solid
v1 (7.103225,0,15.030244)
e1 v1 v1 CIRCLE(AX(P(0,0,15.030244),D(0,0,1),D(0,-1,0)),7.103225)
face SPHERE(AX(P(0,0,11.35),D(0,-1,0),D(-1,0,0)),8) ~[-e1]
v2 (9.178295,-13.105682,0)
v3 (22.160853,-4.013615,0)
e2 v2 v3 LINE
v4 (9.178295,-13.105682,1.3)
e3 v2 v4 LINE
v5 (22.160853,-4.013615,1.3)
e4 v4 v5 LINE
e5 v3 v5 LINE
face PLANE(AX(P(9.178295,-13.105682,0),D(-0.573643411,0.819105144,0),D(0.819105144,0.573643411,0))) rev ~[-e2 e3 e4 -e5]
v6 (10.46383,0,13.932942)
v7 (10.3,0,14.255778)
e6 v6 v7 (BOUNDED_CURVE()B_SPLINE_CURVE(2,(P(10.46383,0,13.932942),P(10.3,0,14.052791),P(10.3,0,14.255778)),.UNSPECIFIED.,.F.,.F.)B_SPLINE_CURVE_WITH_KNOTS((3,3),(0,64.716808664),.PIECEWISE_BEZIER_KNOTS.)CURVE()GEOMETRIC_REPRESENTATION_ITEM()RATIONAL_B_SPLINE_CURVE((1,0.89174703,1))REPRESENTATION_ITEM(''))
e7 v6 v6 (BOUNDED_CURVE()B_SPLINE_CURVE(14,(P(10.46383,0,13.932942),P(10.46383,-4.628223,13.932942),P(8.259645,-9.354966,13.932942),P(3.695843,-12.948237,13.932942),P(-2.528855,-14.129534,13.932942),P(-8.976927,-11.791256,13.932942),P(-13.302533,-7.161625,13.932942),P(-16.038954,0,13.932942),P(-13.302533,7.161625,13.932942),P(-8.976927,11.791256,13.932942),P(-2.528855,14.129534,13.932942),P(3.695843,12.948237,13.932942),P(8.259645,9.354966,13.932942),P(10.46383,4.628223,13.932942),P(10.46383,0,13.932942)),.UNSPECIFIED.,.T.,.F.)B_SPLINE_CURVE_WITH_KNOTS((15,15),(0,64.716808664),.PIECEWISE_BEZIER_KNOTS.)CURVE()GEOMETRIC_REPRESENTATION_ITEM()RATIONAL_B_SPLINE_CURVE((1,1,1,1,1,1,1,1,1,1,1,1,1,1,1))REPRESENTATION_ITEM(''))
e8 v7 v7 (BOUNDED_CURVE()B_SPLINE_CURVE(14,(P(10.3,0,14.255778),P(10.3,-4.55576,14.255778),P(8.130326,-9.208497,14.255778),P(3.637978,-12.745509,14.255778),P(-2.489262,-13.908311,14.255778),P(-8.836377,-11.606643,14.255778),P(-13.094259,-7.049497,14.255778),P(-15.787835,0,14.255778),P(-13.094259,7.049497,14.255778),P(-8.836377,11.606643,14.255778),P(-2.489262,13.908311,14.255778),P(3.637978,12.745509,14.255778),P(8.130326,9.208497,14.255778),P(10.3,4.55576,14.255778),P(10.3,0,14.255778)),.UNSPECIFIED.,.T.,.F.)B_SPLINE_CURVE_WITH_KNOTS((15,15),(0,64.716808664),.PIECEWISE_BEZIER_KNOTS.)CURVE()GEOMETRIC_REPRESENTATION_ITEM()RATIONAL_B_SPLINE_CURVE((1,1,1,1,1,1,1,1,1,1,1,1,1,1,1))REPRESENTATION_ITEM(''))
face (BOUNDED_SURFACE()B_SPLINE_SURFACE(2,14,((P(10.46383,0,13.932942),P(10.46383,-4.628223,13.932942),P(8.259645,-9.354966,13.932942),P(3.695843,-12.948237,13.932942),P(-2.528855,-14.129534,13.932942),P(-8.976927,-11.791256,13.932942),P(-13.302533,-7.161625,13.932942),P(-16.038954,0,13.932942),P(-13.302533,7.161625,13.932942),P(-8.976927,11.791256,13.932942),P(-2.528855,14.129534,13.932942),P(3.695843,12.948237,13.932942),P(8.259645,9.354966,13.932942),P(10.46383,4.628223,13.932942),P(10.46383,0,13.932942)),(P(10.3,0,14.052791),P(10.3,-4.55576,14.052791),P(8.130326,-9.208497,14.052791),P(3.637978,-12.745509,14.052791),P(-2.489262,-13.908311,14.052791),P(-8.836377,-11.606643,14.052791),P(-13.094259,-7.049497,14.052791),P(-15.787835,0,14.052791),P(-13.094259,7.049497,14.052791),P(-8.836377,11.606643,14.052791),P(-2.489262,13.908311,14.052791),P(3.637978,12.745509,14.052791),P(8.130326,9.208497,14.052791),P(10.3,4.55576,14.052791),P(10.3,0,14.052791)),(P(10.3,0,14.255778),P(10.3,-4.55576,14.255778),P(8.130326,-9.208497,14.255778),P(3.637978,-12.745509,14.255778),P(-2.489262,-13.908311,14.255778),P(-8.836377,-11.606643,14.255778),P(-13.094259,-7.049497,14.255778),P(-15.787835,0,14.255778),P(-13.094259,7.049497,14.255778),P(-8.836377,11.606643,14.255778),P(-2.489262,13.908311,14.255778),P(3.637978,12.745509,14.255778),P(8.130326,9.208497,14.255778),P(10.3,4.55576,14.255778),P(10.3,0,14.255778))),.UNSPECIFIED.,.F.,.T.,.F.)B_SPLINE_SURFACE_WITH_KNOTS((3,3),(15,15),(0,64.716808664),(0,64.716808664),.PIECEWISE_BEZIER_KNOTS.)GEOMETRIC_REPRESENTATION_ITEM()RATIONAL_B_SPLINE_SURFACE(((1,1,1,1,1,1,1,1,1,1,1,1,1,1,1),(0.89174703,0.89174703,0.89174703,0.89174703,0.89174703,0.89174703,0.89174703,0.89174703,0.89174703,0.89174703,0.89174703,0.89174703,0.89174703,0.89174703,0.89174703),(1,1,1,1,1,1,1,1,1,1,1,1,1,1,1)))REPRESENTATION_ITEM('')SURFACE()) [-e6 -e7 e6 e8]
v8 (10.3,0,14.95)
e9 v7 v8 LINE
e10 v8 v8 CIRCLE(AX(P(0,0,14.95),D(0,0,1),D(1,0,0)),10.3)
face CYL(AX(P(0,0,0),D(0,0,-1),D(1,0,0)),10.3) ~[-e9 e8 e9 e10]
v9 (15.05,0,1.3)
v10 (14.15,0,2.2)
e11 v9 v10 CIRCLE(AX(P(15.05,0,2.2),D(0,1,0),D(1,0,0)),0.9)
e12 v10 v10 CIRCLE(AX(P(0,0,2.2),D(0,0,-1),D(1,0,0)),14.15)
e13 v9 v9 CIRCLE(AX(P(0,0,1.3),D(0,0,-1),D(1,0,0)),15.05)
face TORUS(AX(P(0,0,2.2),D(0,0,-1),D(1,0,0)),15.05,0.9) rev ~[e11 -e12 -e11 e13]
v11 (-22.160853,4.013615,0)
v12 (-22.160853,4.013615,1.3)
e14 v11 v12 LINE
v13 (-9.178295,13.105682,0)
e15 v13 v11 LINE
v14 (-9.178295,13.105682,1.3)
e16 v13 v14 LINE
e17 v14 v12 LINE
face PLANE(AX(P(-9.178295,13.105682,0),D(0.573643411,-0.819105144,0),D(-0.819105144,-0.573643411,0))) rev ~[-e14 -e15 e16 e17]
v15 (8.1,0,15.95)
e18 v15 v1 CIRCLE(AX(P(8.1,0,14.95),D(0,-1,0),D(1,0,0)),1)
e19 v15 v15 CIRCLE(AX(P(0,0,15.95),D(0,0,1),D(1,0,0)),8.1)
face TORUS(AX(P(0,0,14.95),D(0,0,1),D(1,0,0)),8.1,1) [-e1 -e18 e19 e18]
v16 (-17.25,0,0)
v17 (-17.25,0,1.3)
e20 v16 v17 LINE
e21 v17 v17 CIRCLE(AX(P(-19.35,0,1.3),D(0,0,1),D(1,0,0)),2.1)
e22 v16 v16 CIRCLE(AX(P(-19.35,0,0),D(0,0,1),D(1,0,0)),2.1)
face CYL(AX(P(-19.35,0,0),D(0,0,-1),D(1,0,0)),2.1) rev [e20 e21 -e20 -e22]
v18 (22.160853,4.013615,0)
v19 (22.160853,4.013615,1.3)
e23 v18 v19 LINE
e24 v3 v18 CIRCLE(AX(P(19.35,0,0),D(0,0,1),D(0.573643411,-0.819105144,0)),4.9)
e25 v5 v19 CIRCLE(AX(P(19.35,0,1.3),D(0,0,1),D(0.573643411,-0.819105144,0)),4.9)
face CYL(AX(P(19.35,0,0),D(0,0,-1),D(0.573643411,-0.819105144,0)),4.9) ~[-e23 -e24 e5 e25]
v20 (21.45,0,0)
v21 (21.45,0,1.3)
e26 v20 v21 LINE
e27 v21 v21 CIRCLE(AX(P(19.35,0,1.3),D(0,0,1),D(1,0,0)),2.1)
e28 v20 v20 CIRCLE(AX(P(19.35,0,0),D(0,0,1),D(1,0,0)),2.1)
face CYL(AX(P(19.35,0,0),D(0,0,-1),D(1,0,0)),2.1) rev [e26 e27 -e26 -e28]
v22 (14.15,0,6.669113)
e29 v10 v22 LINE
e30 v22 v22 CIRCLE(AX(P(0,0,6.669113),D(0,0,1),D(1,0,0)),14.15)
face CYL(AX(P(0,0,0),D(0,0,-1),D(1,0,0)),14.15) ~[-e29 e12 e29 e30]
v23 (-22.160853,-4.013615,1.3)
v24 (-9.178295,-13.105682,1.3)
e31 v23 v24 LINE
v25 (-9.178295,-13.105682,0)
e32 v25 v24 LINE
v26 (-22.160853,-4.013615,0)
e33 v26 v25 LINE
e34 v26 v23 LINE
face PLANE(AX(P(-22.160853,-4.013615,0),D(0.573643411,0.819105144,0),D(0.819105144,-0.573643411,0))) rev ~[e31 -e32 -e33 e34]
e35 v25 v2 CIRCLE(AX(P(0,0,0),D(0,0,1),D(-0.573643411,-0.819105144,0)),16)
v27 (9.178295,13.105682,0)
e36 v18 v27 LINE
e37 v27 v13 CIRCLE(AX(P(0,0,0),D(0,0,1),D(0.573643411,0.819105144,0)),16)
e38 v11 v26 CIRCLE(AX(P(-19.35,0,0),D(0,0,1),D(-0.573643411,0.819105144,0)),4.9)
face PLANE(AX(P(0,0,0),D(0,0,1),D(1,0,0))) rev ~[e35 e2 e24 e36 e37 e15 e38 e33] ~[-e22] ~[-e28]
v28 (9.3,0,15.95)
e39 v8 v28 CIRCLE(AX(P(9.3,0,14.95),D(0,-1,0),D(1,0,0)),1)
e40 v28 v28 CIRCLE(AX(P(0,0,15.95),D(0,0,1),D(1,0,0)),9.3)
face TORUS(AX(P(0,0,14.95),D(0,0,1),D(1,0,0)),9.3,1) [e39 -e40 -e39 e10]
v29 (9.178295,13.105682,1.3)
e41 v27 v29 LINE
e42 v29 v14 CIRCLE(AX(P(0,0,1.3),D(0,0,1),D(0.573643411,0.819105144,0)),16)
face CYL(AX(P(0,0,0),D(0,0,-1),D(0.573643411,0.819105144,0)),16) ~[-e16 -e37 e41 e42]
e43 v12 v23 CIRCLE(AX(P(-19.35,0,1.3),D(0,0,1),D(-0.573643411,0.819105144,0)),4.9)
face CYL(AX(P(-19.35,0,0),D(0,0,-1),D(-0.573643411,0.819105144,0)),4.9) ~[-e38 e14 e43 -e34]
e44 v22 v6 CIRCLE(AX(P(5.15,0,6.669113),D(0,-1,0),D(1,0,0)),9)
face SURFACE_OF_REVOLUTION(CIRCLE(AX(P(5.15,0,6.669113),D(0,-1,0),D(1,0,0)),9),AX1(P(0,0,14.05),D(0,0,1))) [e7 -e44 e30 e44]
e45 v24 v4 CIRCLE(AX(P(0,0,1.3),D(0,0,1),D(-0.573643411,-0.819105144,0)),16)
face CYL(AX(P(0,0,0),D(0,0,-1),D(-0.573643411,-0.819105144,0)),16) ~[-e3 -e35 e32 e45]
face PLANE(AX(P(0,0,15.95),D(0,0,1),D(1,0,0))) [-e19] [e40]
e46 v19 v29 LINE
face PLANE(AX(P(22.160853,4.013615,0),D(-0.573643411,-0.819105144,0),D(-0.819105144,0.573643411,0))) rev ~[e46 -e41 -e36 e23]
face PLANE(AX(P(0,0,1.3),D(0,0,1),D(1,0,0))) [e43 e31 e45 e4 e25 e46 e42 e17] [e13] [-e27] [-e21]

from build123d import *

# Parameters (mm, degrees)
F0_R     = 2.1
F0_R_2   = 14.15
F0_R_3   = 10.3
F0_R_4   = 7.1
F1_DEPTH = 1.3
F2_DEPTH = 14.05
F3_DEPTH = 15.95
F4_R     = 0.9
F6_R     = 0.4
F7_R     = 1


# Not quite as in the source:
# - a fillet or chamfer that OpenCascade refuses, or shapes differently, is made with other operations: its cross-section is extruded or revolved along the edge and cut away or added


with BuildPart() as f1:
    # F0 (on Top) → F1 (new body)
    with BuildSketch(Plane.XY):
        with BuildLine():
            Line((9.1782945736, -13.1056823065), (22.1608527132, -4.0136152064))
            ThreePointArc((22.1608527132, -4.0136152064), (24.25, 0), (22.1608527132, 4.0136152064))
            Line((22.1608527132, 4.0136152064), (9.1782945736, 13.1056823065))
            ThreePointArc((9.1782945736, 13.1056823065), (0, 16), (-9.1782945736, 13.1056823065))
            Line((-9.1782945736, 13.1056823065), (-22.1608527132, 4.0136152064))
            ThreePointArc((-22.1608527132, 4.0136152064), (-24.25, 0), (-22.1608527132, -4.0136152064))
            Line((-22.1608527132, -4.0136152064), (-9.1782945736, -13.1056823065))
            ThreePointArc((-9.1782945736, -13.1056823065), (0, -16), (9.1782945736, -13.1056823065))
        make_face()
        with Locations((-19.35, 0)):
            Circle(F0_R, mode=Mode.SUBTRACT)
        Circle(F0_R_2, mode=Mode.SUBTRACT)
        with Locations((19.35, 0)):
            Circle(F0_R, mode=Mode.SUBTRACT)
        Circle(F0_R_2)
        Circle(F0_R_3, mode=Mode.SUBTRACT)
        Circle(F0_R_3)
        Circle(F0_R_4, mode=Mode.SUBTRACT)
        Circle(F0_R_4)
    extrude(amount=F1_DEPTH)

    # F0 (on Top) → F2 (join)
    with BuildSketch(Plane.XY):
        Circle(F0_R_2)
        Circle(F0_R_3, mode=Mode.SUBTRACT)
        Circle(F0_R_3)
        Circle(F0_R_4, mode=Mode.SUBTRACT)
        Circle(F0_R_4)
    extrude(amount=F2_DEPTH)

    # F0 (on Top) → F3 (join)
    with BuildSketch(Plane.XY):
        Circle(F0_R_3)
        Circle(F0_R_4, mode=Mode.SUBTRACT)
    extrude(amount=F3_DEPTH)

    # F4
    f4_edges = [f1.edges().sort_by_distance(p)[0] for p in [
        (-14.15, 0, 1.3),
    ]]
    fillet(f4_edges, radius=F4_R)

    # F5: fillet of radius 9 on 1 edges, made by hand

    # F5_s1 → F5_t2 (revolve, cut)
    with BuildSketch(Plane.XZ):
        with BuildLine():
            ThreePointArc((14.15, 6.6691125195), (13.129661647, 10.8314435971), (10.3, 14.05))
            Line((10.3, 14.05), (14.15, 14.05))
            Line((14.15, 14.05), (14.15, 6.6691125195))
        make_face()
    revolve(axis=Axis((0, 0, 14.05), (0, 0, 1)), mode=Mode.SUBTRACT)

    # F6
    f6_edges = [f1.edges().sort_by_distance(p)[0] for p in [
        (-10.3, 0, 14.05),
    ]]
    fillet(f6_edges, radius=F6_R)

    # F7
    f7_edges = [f1.edges().sort_by_distance(p)[0] for p in [
        (-10.3, 0, 15.95),
        (-7.1, 0, 15.95),
    ]]
    fillet(f7_edges, radius=F7_R)

    # F9 (on offset) → F10 (revolve)
    with BuildSketch(Plane.XY.offset(11.35)):
        with BuildLine():
            Line((0, -8), (0, 8))
            ThreePointArc((0, 8), (-8, 0), (0, -8))
        make_face()
    revolve(axis=Axis((0, -0.0622457136, 11.35), (0, 1, 0)))


solid = f1.part
